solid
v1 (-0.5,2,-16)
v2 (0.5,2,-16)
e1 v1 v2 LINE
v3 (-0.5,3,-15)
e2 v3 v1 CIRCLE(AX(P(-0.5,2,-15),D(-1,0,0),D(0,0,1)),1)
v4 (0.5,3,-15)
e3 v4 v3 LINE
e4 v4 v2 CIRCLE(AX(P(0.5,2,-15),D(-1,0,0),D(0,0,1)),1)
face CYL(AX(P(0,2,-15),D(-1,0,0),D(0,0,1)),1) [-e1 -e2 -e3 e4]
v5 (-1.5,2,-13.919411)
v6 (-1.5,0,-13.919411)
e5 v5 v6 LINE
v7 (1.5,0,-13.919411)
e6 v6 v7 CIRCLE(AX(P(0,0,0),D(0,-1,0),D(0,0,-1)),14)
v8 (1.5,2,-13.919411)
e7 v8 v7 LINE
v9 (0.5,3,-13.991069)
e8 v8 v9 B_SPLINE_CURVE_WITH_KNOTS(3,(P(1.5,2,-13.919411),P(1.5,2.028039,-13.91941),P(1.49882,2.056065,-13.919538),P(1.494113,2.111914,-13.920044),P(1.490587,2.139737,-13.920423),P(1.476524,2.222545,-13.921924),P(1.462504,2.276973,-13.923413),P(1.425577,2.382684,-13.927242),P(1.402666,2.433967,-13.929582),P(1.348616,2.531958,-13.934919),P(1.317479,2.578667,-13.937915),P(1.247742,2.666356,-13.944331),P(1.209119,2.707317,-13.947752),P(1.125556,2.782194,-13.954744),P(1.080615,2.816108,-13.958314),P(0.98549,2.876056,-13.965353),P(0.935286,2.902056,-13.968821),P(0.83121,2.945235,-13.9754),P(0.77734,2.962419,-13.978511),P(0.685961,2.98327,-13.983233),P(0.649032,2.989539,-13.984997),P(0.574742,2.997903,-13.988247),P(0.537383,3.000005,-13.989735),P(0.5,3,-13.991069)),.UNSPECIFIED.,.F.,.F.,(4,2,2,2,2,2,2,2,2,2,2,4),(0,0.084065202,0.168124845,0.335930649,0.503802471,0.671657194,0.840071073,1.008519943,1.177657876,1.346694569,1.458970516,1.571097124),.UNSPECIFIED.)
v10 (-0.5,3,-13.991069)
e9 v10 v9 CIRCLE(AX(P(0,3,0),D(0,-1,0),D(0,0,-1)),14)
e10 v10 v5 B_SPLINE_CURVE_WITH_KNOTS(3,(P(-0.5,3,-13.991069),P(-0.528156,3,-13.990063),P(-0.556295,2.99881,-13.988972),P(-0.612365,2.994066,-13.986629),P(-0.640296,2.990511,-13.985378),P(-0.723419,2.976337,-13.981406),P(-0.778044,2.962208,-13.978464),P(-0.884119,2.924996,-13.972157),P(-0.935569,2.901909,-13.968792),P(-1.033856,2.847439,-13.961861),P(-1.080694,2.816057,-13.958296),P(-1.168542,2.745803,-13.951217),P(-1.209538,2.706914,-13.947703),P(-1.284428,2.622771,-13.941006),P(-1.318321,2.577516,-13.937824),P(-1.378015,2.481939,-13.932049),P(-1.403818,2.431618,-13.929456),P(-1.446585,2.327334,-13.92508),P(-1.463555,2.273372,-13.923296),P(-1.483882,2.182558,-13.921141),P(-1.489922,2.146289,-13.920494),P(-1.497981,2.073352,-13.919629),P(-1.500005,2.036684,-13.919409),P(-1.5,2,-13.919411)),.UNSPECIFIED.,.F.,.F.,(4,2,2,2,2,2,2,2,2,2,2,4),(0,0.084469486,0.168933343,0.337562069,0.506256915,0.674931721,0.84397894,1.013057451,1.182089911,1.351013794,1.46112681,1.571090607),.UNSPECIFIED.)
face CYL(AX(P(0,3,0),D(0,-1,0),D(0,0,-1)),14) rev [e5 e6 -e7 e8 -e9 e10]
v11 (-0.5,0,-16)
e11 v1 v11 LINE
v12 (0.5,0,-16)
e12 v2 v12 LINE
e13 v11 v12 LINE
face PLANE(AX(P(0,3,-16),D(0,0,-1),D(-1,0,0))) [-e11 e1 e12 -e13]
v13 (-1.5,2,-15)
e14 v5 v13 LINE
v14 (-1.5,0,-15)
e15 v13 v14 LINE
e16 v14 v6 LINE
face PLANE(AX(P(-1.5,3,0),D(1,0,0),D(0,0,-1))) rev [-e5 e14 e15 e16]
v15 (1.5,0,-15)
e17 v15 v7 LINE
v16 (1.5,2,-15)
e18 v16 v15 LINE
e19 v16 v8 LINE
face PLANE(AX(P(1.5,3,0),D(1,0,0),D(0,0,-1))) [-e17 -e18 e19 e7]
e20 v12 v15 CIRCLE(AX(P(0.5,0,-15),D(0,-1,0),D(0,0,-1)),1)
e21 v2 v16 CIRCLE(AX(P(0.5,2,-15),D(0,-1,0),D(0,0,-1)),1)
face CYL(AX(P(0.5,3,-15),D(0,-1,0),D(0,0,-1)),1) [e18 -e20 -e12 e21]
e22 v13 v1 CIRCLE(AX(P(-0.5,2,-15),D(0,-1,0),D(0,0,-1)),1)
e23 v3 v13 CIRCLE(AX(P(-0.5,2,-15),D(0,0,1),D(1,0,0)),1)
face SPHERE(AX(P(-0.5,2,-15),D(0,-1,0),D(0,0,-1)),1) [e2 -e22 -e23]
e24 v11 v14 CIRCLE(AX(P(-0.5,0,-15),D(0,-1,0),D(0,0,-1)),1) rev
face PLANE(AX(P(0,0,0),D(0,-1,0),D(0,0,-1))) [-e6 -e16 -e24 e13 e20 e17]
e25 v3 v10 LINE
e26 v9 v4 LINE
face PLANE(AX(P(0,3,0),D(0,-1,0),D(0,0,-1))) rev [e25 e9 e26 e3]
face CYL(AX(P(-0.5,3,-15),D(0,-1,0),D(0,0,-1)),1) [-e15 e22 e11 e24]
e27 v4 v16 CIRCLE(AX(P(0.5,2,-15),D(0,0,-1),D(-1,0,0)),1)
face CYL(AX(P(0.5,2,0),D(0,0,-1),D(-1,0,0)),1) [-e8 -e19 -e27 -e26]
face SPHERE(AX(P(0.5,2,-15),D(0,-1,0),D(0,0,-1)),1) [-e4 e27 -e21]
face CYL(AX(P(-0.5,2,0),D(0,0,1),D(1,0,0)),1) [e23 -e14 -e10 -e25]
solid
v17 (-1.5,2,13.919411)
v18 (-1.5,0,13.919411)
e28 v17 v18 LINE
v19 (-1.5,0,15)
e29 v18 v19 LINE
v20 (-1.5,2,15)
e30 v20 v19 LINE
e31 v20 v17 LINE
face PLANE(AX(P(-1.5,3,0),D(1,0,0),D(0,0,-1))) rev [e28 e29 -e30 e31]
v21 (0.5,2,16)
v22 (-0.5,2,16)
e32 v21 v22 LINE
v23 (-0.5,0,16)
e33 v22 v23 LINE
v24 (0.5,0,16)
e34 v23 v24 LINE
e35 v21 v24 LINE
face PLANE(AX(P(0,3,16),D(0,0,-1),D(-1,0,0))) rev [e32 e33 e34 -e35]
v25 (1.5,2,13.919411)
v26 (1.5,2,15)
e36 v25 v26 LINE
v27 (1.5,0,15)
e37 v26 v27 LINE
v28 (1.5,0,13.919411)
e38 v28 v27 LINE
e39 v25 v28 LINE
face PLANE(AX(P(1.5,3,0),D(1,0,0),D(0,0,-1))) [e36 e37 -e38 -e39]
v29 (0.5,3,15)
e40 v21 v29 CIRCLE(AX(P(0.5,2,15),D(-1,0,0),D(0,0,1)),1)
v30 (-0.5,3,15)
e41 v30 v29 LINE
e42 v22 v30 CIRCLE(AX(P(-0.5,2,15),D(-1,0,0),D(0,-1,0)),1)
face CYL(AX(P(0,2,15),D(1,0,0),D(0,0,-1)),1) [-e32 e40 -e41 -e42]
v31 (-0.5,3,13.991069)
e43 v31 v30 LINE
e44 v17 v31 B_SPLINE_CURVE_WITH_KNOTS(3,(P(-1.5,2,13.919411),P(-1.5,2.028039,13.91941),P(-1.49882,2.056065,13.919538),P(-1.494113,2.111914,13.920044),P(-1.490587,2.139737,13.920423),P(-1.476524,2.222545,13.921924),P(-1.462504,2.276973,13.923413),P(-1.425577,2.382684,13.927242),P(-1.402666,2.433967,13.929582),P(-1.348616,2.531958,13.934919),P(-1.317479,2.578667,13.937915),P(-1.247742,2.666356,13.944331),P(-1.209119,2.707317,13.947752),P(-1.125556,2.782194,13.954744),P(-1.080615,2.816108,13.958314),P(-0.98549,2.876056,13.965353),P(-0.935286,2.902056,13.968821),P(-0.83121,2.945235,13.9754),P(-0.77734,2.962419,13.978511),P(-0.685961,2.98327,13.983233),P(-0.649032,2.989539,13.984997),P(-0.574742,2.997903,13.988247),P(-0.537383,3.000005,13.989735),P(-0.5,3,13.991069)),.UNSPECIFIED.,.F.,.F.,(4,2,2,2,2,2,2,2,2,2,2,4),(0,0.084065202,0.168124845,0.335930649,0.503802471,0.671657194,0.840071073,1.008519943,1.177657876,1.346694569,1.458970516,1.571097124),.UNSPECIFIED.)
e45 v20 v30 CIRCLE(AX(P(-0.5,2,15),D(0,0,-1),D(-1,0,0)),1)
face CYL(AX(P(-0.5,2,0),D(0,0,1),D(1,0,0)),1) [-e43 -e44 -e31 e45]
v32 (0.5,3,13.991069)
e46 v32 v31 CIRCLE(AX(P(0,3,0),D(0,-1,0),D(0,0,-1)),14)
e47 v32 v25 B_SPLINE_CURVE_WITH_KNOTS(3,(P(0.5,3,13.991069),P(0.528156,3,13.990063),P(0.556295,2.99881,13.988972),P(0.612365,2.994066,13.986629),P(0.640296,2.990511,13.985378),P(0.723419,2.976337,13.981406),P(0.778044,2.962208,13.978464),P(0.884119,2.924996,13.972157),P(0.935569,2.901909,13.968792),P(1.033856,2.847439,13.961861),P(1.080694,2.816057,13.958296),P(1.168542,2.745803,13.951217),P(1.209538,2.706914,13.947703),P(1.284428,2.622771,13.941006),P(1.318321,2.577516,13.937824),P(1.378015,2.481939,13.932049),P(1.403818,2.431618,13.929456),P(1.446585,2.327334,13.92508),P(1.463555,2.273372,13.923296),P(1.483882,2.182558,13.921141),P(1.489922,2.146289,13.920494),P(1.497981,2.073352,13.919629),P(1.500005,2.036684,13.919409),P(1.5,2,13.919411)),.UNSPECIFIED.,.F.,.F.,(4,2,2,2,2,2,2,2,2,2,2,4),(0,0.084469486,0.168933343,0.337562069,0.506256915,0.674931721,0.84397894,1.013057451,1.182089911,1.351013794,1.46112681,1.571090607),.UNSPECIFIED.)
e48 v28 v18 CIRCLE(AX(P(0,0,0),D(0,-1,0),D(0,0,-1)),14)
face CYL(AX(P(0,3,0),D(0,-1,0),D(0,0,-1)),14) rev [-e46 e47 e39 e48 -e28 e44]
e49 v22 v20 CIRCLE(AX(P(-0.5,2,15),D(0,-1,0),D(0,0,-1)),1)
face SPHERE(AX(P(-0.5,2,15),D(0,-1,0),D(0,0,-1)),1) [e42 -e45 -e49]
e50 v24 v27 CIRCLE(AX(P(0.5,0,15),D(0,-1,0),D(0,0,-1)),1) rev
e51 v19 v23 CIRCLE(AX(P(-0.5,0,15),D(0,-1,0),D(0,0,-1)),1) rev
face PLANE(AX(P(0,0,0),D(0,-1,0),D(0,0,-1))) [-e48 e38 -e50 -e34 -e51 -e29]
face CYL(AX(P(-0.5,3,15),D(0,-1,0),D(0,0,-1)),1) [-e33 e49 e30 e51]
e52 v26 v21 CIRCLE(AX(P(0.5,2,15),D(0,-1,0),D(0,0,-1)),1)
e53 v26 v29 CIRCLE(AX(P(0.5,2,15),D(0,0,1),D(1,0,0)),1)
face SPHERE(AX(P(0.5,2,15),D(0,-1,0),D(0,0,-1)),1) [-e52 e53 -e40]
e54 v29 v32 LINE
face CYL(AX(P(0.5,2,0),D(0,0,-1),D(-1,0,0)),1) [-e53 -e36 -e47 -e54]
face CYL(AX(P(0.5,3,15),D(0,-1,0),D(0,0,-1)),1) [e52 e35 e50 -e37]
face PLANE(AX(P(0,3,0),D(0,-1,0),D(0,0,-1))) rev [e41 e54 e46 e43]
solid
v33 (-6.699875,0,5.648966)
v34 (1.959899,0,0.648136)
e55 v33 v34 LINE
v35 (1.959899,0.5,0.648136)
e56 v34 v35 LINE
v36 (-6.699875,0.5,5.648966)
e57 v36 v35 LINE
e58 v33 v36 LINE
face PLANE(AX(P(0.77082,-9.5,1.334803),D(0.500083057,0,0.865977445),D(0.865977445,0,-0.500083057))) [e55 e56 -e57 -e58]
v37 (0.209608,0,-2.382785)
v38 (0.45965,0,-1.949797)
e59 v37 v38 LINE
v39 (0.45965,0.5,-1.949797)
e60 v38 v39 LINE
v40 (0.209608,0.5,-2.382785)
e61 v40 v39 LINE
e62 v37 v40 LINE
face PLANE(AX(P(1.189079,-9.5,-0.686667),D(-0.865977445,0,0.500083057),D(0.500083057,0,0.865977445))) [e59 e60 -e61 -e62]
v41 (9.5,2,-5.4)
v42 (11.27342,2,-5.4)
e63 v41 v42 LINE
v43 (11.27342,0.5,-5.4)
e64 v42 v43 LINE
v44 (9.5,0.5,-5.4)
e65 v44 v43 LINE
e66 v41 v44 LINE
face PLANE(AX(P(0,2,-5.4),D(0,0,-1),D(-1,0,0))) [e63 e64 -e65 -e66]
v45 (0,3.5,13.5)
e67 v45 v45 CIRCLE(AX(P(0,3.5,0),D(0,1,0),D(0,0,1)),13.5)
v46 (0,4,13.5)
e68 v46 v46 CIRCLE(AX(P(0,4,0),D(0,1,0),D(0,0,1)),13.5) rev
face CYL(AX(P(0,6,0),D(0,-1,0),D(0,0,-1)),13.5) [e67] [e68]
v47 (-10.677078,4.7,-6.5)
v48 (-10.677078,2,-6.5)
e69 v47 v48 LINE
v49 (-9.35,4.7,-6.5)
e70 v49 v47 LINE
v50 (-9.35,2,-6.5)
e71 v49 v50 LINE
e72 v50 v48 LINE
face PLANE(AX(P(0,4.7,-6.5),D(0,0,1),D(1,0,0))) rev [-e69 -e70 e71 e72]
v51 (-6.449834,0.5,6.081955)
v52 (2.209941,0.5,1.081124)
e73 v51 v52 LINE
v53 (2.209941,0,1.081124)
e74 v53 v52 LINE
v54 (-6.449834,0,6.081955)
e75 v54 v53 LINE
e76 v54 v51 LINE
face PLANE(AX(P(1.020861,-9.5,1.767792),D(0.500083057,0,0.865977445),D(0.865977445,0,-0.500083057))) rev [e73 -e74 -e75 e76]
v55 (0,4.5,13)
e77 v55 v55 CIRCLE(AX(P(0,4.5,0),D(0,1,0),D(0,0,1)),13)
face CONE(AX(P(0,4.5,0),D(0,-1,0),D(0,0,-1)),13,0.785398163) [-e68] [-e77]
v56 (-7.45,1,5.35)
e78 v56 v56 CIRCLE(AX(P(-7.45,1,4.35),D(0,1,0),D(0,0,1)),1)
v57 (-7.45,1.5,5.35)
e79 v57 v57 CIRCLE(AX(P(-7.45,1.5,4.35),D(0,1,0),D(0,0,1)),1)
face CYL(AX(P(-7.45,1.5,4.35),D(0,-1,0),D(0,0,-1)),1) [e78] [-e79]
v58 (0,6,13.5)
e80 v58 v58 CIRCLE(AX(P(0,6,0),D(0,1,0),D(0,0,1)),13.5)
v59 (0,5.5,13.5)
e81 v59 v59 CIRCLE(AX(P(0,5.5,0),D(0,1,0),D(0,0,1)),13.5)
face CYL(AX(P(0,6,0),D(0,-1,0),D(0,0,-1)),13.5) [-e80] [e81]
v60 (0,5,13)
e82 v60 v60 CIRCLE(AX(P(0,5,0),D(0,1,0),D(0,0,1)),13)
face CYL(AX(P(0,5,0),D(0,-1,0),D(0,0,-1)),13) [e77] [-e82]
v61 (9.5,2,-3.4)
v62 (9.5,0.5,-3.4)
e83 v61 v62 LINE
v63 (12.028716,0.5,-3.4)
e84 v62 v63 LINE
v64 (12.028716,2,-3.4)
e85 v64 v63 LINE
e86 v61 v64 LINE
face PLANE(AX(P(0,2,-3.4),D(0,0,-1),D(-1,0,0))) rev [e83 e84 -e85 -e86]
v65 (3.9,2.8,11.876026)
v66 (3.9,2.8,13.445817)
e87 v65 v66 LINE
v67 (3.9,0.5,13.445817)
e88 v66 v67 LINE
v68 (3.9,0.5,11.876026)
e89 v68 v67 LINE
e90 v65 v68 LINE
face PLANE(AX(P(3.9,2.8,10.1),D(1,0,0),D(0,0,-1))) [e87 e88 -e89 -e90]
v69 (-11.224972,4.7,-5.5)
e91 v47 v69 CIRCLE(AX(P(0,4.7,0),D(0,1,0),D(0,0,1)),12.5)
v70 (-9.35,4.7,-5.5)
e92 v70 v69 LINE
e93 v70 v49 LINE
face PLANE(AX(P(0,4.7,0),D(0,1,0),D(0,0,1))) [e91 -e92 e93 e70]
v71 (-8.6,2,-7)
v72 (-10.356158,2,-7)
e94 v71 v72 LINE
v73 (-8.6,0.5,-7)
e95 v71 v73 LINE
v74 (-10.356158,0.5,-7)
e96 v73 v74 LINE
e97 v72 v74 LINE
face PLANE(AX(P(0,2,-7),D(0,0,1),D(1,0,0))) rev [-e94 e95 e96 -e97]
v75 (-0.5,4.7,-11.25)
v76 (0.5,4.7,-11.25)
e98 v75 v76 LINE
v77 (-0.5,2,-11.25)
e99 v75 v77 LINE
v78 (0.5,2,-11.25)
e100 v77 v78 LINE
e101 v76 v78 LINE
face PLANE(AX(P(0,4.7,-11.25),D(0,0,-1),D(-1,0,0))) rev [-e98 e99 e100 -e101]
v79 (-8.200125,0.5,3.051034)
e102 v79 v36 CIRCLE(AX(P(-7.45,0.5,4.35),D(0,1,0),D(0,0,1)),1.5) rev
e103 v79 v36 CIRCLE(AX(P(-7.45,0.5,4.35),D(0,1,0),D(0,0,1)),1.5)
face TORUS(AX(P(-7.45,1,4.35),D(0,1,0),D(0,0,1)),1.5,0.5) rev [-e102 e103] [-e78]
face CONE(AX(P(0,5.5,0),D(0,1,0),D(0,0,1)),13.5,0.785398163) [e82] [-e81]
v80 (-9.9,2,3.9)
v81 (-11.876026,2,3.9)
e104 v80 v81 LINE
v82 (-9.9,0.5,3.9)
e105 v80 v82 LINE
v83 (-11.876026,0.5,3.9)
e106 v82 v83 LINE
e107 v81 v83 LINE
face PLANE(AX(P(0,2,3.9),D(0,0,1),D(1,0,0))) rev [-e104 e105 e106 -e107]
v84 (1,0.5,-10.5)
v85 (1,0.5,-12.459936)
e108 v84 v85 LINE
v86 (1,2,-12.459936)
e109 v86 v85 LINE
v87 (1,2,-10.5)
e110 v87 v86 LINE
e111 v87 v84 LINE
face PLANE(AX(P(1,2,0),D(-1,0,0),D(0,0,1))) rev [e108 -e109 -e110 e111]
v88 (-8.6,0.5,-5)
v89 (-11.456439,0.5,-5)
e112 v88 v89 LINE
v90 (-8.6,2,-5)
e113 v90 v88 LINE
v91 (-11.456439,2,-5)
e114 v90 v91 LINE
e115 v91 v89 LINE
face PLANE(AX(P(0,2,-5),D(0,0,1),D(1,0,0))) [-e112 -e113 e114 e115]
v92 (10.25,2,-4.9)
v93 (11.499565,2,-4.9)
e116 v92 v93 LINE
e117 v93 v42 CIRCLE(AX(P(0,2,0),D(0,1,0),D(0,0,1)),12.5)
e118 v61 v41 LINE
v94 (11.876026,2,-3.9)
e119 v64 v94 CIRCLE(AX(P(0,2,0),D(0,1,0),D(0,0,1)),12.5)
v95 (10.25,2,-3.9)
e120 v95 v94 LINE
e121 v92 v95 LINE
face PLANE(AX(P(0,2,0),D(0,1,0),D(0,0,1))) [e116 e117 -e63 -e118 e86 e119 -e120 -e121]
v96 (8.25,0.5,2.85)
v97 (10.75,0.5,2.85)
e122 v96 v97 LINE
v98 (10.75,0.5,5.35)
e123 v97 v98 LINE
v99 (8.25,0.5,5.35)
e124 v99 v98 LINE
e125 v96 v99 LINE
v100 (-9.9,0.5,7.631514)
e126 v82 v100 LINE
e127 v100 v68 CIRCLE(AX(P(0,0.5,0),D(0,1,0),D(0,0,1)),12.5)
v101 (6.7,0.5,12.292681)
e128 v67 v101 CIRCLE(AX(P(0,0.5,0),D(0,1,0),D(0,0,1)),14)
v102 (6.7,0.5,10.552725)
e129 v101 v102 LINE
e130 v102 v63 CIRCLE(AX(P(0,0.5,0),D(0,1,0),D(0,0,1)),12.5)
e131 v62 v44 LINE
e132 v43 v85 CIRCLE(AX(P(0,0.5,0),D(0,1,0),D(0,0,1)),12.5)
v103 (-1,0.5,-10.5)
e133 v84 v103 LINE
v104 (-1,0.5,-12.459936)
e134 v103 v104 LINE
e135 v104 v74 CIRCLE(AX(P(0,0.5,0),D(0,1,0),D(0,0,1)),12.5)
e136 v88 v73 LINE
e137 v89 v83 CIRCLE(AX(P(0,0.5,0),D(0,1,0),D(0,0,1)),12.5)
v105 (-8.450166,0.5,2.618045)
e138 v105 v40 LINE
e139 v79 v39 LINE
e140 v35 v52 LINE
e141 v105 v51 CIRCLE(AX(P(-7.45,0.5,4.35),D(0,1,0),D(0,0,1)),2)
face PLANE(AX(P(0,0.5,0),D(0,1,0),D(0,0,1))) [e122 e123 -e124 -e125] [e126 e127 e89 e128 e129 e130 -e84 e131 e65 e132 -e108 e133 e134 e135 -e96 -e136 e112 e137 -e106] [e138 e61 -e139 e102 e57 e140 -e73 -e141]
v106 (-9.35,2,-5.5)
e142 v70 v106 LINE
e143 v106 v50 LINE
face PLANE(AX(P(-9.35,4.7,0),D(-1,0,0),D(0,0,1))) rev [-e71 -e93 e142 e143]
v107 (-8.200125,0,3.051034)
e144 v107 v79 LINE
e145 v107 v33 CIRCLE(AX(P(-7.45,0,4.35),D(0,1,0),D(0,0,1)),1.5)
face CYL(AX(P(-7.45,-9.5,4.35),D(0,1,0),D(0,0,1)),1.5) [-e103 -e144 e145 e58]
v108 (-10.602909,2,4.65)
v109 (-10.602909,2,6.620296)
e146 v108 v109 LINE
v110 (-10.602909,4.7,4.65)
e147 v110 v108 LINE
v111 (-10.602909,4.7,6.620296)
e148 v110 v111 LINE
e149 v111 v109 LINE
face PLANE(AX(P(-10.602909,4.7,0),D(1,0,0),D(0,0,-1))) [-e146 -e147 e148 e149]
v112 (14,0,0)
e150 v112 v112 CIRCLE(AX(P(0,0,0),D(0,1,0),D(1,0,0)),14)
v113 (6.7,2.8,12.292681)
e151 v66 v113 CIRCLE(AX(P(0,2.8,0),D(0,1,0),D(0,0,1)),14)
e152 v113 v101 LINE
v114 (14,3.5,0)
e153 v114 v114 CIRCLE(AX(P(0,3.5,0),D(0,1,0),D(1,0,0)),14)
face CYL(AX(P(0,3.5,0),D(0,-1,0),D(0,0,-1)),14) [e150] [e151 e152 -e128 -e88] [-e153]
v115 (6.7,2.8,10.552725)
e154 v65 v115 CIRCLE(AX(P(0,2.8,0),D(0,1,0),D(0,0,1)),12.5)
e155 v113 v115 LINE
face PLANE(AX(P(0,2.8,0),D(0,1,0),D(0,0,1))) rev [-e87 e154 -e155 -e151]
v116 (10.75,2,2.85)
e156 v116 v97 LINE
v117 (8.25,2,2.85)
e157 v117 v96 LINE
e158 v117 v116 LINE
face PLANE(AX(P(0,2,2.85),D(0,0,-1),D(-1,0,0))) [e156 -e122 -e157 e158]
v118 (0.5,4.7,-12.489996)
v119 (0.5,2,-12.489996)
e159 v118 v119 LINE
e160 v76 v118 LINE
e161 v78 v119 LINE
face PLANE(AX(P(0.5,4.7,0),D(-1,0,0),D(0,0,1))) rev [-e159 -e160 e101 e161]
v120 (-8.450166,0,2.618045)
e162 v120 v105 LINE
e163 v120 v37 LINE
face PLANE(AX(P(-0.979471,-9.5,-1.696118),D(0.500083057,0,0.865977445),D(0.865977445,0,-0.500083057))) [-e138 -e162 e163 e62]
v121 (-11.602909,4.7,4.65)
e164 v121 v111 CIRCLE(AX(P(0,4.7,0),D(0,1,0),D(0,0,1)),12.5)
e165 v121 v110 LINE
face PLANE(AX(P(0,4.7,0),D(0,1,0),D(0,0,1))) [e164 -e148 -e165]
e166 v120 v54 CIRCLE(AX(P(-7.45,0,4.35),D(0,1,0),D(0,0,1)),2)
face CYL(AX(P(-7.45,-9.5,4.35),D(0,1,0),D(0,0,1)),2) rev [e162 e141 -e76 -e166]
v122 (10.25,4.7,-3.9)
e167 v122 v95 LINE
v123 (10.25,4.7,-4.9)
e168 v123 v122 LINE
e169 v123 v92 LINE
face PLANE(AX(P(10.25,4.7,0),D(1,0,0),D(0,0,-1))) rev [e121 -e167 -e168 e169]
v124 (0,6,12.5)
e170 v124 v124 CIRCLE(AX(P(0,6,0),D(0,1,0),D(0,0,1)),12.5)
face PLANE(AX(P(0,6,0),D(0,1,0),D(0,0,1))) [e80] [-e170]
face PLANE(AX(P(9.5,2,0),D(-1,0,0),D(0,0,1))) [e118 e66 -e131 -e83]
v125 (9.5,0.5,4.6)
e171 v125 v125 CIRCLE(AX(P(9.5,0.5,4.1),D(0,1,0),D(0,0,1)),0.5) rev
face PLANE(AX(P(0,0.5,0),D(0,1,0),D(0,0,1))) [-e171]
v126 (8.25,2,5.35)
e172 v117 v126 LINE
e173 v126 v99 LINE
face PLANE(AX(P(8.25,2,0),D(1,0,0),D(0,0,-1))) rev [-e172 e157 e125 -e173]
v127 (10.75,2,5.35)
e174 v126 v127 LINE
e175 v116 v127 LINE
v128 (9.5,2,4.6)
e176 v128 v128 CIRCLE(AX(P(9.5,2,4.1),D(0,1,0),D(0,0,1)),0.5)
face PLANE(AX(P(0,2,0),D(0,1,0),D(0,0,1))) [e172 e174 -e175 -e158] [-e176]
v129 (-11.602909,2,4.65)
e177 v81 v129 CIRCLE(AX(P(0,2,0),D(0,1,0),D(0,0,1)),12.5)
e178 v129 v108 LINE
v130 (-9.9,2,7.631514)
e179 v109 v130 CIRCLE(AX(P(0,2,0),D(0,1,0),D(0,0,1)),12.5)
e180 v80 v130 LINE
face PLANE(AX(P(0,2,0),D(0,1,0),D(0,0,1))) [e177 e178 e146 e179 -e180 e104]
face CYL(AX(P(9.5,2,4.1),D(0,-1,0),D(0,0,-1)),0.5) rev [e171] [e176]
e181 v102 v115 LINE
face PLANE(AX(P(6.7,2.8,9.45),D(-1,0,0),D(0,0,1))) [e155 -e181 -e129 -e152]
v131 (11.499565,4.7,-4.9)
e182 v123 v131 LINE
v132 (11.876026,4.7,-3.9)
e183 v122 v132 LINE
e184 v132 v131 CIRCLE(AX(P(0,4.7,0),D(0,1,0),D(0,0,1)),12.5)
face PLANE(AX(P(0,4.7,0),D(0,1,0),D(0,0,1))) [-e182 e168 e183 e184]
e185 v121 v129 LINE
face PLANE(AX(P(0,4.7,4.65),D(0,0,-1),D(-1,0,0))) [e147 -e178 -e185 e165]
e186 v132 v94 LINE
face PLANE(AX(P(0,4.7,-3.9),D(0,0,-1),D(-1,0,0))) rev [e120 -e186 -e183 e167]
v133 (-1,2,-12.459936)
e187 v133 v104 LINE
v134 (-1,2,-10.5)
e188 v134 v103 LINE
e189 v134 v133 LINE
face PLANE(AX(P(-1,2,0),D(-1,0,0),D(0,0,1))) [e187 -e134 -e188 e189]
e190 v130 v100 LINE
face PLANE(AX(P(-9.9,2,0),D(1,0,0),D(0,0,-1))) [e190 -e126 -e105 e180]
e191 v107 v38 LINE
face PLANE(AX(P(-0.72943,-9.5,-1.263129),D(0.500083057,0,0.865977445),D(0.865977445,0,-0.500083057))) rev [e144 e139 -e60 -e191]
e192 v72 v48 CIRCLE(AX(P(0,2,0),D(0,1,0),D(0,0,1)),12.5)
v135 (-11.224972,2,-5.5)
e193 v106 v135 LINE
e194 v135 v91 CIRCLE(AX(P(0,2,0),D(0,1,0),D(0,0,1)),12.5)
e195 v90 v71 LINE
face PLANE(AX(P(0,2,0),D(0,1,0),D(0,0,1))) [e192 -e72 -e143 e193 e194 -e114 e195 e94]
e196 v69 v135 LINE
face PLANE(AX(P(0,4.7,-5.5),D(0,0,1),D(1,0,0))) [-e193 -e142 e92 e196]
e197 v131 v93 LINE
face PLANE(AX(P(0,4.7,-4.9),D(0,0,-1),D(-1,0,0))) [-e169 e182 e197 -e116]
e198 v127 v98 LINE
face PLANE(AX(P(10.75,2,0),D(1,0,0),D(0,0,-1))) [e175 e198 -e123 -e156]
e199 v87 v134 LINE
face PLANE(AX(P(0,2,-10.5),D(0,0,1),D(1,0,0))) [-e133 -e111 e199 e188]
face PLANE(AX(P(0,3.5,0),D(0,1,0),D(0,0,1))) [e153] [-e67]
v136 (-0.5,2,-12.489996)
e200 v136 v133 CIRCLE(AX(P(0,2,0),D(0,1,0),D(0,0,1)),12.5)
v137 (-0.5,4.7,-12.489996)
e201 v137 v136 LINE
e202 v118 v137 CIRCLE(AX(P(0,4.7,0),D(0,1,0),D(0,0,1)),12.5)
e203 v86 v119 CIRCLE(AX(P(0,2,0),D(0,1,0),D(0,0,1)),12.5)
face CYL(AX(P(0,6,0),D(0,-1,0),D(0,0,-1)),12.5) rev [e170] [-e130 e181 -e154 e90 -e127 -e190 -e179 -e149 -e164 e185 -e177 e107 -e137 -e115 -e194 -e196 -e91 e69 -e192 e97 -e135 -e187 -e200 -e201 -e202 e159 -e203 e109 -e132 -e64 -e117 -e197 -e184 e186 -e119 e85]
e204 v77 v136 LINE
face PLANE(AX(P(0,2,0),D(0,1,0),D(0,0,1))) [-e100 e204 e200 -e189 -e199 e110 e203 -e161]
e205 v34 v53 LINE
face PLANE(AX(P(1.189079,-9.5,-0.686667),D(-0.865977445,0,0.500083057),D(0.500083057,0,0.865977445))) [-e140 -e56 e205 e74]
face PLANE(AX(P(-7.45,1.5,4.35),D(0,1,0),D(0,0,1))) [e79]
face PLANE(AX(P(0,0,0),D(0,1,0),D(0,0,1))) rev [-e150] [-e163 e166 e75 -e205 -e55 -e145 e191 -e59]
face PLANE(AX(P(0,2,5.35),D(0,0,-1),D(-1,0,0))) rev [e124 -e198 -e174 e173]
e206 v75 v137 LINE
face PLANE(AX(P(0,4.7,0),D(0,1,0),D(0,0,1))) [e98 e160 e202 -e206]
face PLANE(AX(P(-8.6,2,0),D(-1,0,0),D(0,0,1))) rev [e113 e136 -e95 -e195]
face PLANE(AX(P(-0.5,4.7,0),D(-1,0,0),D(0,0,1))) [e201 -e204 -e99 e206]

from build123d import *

# Parameters (mm, degrees)
SKETCH1_R              = 13.5
SKETCH1_R_2            = 12.5
BOSS_EXTRUDE1_DEPTH    = 6
SKETCH1_2_R            = 12.5
BOSS_EXTRUDE3_DEPTH    = 0.5
SKETCH1_3_R            = 14
SKETCH1_3_R_2          = 13.5
SKETCH1_3_R_3          = 13
SKETCH1_3_R_4          = 12.5
EXTRUDE_THIN1_DEPTH    = 3.5
SKETCH12_W             = 2.5
SKETCH12_H             = 2.5
SKETCH12_R             = 0.5
BOSS_EXTRUDE10_DEPTH   = 1.5
BOSS_EXTRUDE12_DEPTH   = 2.7
CUT_EXTRUDE1_DEPTH     = 10
SKETCH14_R             = 1
BOSS_EXTRUDE11_DEPTH   = 1
FILLET7_R              = 0.5
CUT_EXTRUDE2_DEPTH     = 2.3
BOSS_EXTRUDE13_DEPTH   = 3
BOSS_EXTRUDE13_2_DEPTH = 3
FILLET8_R              = 1
FILLET9_R              = 1
CUT_EXTRUDE3_START     = 1
SKETCH18_R             = 13.5
SKETCH18_R_2           = 13
CUT_EXTRUDE3_DEPTH     = 0.5
CHAMFER1_SIZE          = 0.5
CHAMFER3_SIZE          = 0.5


with BuildPart() as part:
    # Sketch1 → Boss-Extrude1 (new body)
    with BuildSketch(Plane(origin=(0, 0, 0), x_dir=(1, 0, 0), z_dir=(0, 1, 0))):
        with Locations(Location((0, 0, 0), (0, 0, 270))):
            Circle(SKETCH1_R)
        with Locations(Location((0, 0, 0), (0, 0, 270))):
            Circle(SKETCH1_R_2, mode=Mode.SUBTRACT)
    extrude(amount=BOSS_EXTRUDE1_DEPTH)

    # Sketch1<2> → Boss-Extrude3 (add)
    with BuildSketch(Plane(origin=(0, 0, 0), x_dir=(1, 0, 0), z_dir=(0, 1, 0))):
        with Locations(Location((0, 0, 0), (0, 0, 270))):
            Circle(SKETCH1_2_R)
    extrude(amount=BOSS_EXTRUDE3_DEPTH)

    # Sketch1<3> → Extrude-Thin1 (add)
    # profile 1 of 2: a face of its own
    with BuildSketch(Plane(origin=(0, 0, 0), x_dir=(1, 0, 0), z_dir=(0, 1, 0))):
        Circle(SKETCH1_3_R)
        Circle(SKETCH1_3_R_2, mode=Mode.SUBTRACT)
    # profile 2 of 2: a face of its own
    with BuildSketch(Plane(origin=(0, 0, 0), x_dir=(1, 0, 0), z_dir=(0, 1, 0))):
        Circle(SKETCH1_3_R_3)
        Circle(SKETCH1_3_R_4, mode=Mode.SUBTRACT)
    extrude(amount=EXTRUDE_THIN1_DEPTH)

    # Sketch12 → Boss-Extrude10 (add)
    # profile 1 of 5: a face of its own
    with BuildSketch(Plane(origin=(0, 0.5, 0), x_dir=(1, 0, 0), z_dir=(0, 1, 0))):
        with BuildLine():
            Line((-8.6, 5), (-8.6, 7))
            Line((-8.6, 7), (-10.356157589, 7))
            ThreePointArc((-10.356157589, 7), (-10.952047529, 6.025168456), (-11.456439237, 5))
            Line((-11.456439237, 5), (-8.6, 5))
        make_face()
    # profile 2 of 5: a face of its own
    with BuildSketch(Plane(origin=(0, 0.5, 0), x_dir=(1, 0, 0), z_dir=(0, 1, 0))):
        with BuildLine():
            Line((-1, 10.5), (1, 10.5))
            Line((1, 10.5), (1, 12.459935794))
            ThreePointArc((1, 12.459935794), (0, 12.5), (-1, 12.459935794))
            Line((-1, 12.459935794), (-1, 10.5))
        make_face()
    # profile 3 of 5: a face of its own
    with BuildSketch(Plane(origin=(0, 0.5, 0), x_dir=(1, 0, 0), z_dir=(0, 1, 0))):
        with BuildLine():
            Line((11.273420067, 5.4), (9.5, 5.4))
            Line((9.5, 5.4), (9.5, 3.4))
            Line((9.5, 3.4), (12.028715642, 3.4))
            ThreePointArc((12.028715642, 3.4), (11.693903632, 4.416176837), (11.273420067, 5.4))
        make_face()
    # profile 4 of 5: a face of its own
    with BuildSketch(Plane(origin=(0, 0.5, 0), x_dir=(1, 0, 0), z_dir=(0, 1, 0))):
        with BuildLine():
            Line((-9.9, -3.9), (-11.876026271, -3.9))
            ThreePointArc((-11.876026271, -3.9), (-11.046713471, -5.849796706), (-9.9, -7.631513611))
            Line((-9.9, -7.631513611), (-9.9, -3.9))
        make_face()
    # profile 5 of 5: a face of its own
    with BuildSketch(Plane(origin=(0, 0.5, 0), x_dir=(1, 0, 0), z_dir=(0, 1, 0))):
        with Locations((9.5, -4.1)):
            Rectangle(SKETCH12_W, SKETCH12_H)
        with Locations(Location((9.5, -4.1, 0), (0, 0, 270))):
            Circle(SKETCH12_R, mode=Mode.SUBTRACT)
    extrude(amount=BOSS_EXTRUDE10_DEPTH)

    # Sketch15 → Boss-Extrude12 (add)
    with BuildSketch(Plane(origin=(0, 2, 0), x_dir=(1, 0, 0), z_dir=(0, 1, 0))):
        with BuildLine():
            Line((0.5, 11.25), (0.5, 12.489995997))
            ThreePointArc((0.5, 12.489995997), (0, 12.5), (-0.5, 12.489995997))
            Line((-0.5, 12.489995997), (-0.5, 11.25))
            Line((-0.5, 11.25), (0.5, 11.25))
        make_face()
        with BuildLine():
            Line((-9.35, 5.5), (-9.35, 6))
            Line((-9.35, 6), (-9.35, 6.5))
            Line((-9.35, 6.5), (-10.677078252, 6.5))
            ThreePointArc((-10.677078252, 6.5), (-10.96243372, 6.006250655), (-11.22497216, 5.5))
            Line((-11.22497216, 5.5), (-9.35, 5.5))
        make_face()
        with BuildLine():
            Line((-11.602909118, -4.65), (-10.602909118, -4.65))
            Line((-10.602909118, -4.65), (-10.602909118, -6.620295933))
            ThreePointArc((-10.602909118, -6.620295933), (-11.146528939, -5.657286682), (-11.602909118, -4.65))
        make_face()
        with BuildLine():
            Line((10.25, 3.9), (11.876026271, 3.9))
            ThreePointArc((11.876026271, 3.9), (11.698485768, 4.404024379), (11.499565209, 4.9))
            Line((11.499565209, 4.9), (10.25, 4.9))
            Line((10.25, 4.9), (10.25, 3.9))
        make_face()
    extrude(amount=BOSS_EXTRUDE12_DEPTH)

    # Sketch13 → Cut-Extrude1 (cut)
    with BuildSketch(Plane(origin=(0, 0.5, 0), x_dir=(1, 0, 0), z_dir=(0, 1, 0))):
        with BuildLine():
            Line((0.209608339, 2.382785463), (-8.450166114, -2.618045109))
            ThreePointArc((-8.450166114, -2.618045109), (-7.773231209, -2.376292426), (-7.054544105, -2.38948613))
            Line((-7.054544105, -2.38948613), (0.459649868, 1.94979674))
            Line((0.459649868, 1.94979674), (0.209608339, 2.382785463))
        make_face()
        with BuildLine():
            ThreePointArc((-7.054544105, -2.38948613), (-7.773231209, -2.376292426), (-8.450166114, -2.618045109))
            Line((-8.450166114, -2.618045109), (-8.200124586, -3.051033832))
            Line((-8.200124586, -3.051033832), (-7.054544105, -2.38948613))
        make_face()
        with BuildLine():
            ThreePointArc((-8.450166114, -2.618045109), (-9.181954891, -5.350166114), (-6.449833886, -6.081954891))
            Line((-6.449833886, -6.081954891), (-6.699875414, -5.648966168))
            ThreePointArc((-6.699875414, -5.648966168), (-8.748966168, -5.100124586), (-8.200124586, -3.051033832))
            Line((-8.200124586, -3.051033832), (-8.450166114, -2.618045109))
        make_face()
        with BuildLine():
            Line((-6.699875414, -5.648966168), (-6.449833886, -6.081954891))
            ThreePointArc((-6.449833886, -6.081954891), (-5.902091744, -5.616483332), (-5.554294933, -4.987418466))
            Line((-5.554294933, -4.987418466), (-6.699875414, -5.648966168))
        make_face()
        with BuildLine():
            ThreePointArc((-5.554294933, -4.987418466), (-5.902091744, -5.616483332), (-6.449833886, -6.081954891))
            Line((-6.449833886, -6.081954891), (2.209940568, -1.081124319))
            Line((2.209940568, -1.081124319), (1.95989904, -0.648135596))
            Line((1.95989904, -0.648135596), (-5.554294933, -4.987418466))
        make_face()
    extrude(amount=-CUT_EXTRUDE1_DEPTH, mode=Mode.SUBTRACT)

    # Sketch14 → Boss-Extrude11 (add)
    with BuildSketch(Plane(origin=(0, 0.5, 0), x_dir=(1, 0, 0), z_dir=(0, 1, 0))):
        with Locations(Location((-7.45, -4.35, 0), (0, 0, 270))):
            Circle(SKETCH14_R)
    extrude(amount=BOSS_EXTRUDE11_DEPTH)

    # Fillet7
    fillet7_edges = [part.edges().sort_by_distance(p)[0] for p in [
        (-7.45, 0.5, 3.35),
    ]]
    fillet(fillet7_edges, radius=FILLET7_R - 0.0001)  # a hair under: the kernel refuses the full size

    # Sketch16 → Cut-Extrude2 (cut)
    with BuildSketch(Plane(origin=(0, 0.5, 0), x_dir=(1, 0, 0), z_dir=(0, 1, 0))):
        with BuildLine():
            Line((3.9, -10.1), (3.9, -13.445817193))
            ThreePointArc((3.9, -13.445817193), (5.331269165, -12.945175514), (6.7, -12.292680749))
            Line((6.7, -12.292680749), (6.7, -9.45))
            Line((6.7, -9.45), (3.9, -10.1))
        make_face()
    extrude(amount=CUT_EXTRUDE2_DEPTH, mode=Mode.SUBTRACT)

    # Sketch18 → Cut-Extrude3 (cut)
    with BuildSketch(Plane(origin=(0, 3.5, 0), x_dir=(1, 0, 0), z_dir=(0, 1, 0)).offset(CUT_EXTRUDE3_START)):
        with Locations(Location((0, 0, 0), (0, 0, 270))):
            Circle(SKETCH18_R)
        with Locations(Location((0, 0, 0), (0, 0, 270))):
            Circle(SKETCH18_R_2, mode=Mode.SUBTRACT)
    extrude(amount=CUT_EXTRUDE3_DEPTH, mode=Mode.SUBTRACT)

    # Chamfer1
    chamfer1_edges = [part.edges().sort_by_distance(p)[0] for p in [
        (0, 5, -13.5),
    ]]
    chamfer(chamfer1_edges, length=CHAMFER1_SIZE - 0.0001)  # a hair under: the kernel refuses the full size

    # Chamfer3
    chamfer3_edges = [part.edges().sort_by_distance(p)[0] for p in [
        (0, 4.5, -13.5),
    ]]
    chamfer(chamfer3_edges, length=CHAMFER3_SIZE - 0.0001)  # a hair under: the kernel refuses the full size


with BuildPart() as body_2:
    # Sketch17 → Boss-Extrude13 (new body)
    with BuildSketch(Plane(origin=(0, 0, 0), x_dir=(-1, 0, 0), z_dir=(0, -1, 0))):
        with BuildLine():
            Line((1.5, -15), (1.5, -13.919410907))
            ThreePointArc((1.5, -13.919410907), (0, -14), (-1.5, -13.919410907))
            Line((-1.5, -13.919410907), (-1.5, -15))
            ThreePointArc((-1.5, -15), (-1.207106781, -15.707106781), (-0.5, -16))
            Line((-0.5, -16), (0.5, -16))
            ThreePointArc((0.5, -16), (1.207106781, -15.707106781), (1.5, -15))
        make_face()
    extrude(amount=-BOSS_EXTRUDE13_DEPTH)

    # Fillet9
    fillet9_edges = [body_2.edges().sort_by_distance(p)[0] for p in [
        (1.5, 3, 14.459705454),
        (1.207106781, 3, 15.707106781),
        (0, 3, 16),
        (-1.207106781, 3, 15.707106781),
        (-1.5, 3, 14.459705454),
    ]]
    fillet(fillet9_edges, radius=FILLET9_R)


with BuildPart() as body_3:
    # Sketch17 → Boss-Extrude13 2 (new body)
    with BuildSketch(Plane(origin=(0, 0, 0), x_dir=(-1, 0, 0), z_dir=(0, -1, 0))):
        with BuildLine():
            ThreePointArc((1.5, 15), (1.207106781, 15.707106781), (0.5, 16))
            Line((0.5, 16), (-0.5, 16))
            ThreePointArc((-0.5, 16), (-1.207106781, 15.707106781), (-1.5, 15))
            Line((-1.5, 15), (-1.5, 13.919410907))
            ThreePointArc((-1.5, 13.919410907), (0, 14), (1.5, 13.919410907))
            Line((1.5, 13.919410907), (1.5, 15))
        make_face()
    extrude(amount=-BOSS_EXTRUDE13_2_DEPTH)

    # Fillet8
    fillet8_edges = [body_3.edges().sort_by_distance(p)[0] for p in [
        (1.207106781, 3, -15.707106781),
        (1.5, 3, -14.459705454),
        (-1.5, 3, -14.459705454),
        (-1.207106781, 3, -15.707106781),
        (0, 3, -16),
    ]]
    fillet(fillet8_edges, radius=FILLET8_R)


solid = Compound([part.part, body_2.part, body_3.part])
